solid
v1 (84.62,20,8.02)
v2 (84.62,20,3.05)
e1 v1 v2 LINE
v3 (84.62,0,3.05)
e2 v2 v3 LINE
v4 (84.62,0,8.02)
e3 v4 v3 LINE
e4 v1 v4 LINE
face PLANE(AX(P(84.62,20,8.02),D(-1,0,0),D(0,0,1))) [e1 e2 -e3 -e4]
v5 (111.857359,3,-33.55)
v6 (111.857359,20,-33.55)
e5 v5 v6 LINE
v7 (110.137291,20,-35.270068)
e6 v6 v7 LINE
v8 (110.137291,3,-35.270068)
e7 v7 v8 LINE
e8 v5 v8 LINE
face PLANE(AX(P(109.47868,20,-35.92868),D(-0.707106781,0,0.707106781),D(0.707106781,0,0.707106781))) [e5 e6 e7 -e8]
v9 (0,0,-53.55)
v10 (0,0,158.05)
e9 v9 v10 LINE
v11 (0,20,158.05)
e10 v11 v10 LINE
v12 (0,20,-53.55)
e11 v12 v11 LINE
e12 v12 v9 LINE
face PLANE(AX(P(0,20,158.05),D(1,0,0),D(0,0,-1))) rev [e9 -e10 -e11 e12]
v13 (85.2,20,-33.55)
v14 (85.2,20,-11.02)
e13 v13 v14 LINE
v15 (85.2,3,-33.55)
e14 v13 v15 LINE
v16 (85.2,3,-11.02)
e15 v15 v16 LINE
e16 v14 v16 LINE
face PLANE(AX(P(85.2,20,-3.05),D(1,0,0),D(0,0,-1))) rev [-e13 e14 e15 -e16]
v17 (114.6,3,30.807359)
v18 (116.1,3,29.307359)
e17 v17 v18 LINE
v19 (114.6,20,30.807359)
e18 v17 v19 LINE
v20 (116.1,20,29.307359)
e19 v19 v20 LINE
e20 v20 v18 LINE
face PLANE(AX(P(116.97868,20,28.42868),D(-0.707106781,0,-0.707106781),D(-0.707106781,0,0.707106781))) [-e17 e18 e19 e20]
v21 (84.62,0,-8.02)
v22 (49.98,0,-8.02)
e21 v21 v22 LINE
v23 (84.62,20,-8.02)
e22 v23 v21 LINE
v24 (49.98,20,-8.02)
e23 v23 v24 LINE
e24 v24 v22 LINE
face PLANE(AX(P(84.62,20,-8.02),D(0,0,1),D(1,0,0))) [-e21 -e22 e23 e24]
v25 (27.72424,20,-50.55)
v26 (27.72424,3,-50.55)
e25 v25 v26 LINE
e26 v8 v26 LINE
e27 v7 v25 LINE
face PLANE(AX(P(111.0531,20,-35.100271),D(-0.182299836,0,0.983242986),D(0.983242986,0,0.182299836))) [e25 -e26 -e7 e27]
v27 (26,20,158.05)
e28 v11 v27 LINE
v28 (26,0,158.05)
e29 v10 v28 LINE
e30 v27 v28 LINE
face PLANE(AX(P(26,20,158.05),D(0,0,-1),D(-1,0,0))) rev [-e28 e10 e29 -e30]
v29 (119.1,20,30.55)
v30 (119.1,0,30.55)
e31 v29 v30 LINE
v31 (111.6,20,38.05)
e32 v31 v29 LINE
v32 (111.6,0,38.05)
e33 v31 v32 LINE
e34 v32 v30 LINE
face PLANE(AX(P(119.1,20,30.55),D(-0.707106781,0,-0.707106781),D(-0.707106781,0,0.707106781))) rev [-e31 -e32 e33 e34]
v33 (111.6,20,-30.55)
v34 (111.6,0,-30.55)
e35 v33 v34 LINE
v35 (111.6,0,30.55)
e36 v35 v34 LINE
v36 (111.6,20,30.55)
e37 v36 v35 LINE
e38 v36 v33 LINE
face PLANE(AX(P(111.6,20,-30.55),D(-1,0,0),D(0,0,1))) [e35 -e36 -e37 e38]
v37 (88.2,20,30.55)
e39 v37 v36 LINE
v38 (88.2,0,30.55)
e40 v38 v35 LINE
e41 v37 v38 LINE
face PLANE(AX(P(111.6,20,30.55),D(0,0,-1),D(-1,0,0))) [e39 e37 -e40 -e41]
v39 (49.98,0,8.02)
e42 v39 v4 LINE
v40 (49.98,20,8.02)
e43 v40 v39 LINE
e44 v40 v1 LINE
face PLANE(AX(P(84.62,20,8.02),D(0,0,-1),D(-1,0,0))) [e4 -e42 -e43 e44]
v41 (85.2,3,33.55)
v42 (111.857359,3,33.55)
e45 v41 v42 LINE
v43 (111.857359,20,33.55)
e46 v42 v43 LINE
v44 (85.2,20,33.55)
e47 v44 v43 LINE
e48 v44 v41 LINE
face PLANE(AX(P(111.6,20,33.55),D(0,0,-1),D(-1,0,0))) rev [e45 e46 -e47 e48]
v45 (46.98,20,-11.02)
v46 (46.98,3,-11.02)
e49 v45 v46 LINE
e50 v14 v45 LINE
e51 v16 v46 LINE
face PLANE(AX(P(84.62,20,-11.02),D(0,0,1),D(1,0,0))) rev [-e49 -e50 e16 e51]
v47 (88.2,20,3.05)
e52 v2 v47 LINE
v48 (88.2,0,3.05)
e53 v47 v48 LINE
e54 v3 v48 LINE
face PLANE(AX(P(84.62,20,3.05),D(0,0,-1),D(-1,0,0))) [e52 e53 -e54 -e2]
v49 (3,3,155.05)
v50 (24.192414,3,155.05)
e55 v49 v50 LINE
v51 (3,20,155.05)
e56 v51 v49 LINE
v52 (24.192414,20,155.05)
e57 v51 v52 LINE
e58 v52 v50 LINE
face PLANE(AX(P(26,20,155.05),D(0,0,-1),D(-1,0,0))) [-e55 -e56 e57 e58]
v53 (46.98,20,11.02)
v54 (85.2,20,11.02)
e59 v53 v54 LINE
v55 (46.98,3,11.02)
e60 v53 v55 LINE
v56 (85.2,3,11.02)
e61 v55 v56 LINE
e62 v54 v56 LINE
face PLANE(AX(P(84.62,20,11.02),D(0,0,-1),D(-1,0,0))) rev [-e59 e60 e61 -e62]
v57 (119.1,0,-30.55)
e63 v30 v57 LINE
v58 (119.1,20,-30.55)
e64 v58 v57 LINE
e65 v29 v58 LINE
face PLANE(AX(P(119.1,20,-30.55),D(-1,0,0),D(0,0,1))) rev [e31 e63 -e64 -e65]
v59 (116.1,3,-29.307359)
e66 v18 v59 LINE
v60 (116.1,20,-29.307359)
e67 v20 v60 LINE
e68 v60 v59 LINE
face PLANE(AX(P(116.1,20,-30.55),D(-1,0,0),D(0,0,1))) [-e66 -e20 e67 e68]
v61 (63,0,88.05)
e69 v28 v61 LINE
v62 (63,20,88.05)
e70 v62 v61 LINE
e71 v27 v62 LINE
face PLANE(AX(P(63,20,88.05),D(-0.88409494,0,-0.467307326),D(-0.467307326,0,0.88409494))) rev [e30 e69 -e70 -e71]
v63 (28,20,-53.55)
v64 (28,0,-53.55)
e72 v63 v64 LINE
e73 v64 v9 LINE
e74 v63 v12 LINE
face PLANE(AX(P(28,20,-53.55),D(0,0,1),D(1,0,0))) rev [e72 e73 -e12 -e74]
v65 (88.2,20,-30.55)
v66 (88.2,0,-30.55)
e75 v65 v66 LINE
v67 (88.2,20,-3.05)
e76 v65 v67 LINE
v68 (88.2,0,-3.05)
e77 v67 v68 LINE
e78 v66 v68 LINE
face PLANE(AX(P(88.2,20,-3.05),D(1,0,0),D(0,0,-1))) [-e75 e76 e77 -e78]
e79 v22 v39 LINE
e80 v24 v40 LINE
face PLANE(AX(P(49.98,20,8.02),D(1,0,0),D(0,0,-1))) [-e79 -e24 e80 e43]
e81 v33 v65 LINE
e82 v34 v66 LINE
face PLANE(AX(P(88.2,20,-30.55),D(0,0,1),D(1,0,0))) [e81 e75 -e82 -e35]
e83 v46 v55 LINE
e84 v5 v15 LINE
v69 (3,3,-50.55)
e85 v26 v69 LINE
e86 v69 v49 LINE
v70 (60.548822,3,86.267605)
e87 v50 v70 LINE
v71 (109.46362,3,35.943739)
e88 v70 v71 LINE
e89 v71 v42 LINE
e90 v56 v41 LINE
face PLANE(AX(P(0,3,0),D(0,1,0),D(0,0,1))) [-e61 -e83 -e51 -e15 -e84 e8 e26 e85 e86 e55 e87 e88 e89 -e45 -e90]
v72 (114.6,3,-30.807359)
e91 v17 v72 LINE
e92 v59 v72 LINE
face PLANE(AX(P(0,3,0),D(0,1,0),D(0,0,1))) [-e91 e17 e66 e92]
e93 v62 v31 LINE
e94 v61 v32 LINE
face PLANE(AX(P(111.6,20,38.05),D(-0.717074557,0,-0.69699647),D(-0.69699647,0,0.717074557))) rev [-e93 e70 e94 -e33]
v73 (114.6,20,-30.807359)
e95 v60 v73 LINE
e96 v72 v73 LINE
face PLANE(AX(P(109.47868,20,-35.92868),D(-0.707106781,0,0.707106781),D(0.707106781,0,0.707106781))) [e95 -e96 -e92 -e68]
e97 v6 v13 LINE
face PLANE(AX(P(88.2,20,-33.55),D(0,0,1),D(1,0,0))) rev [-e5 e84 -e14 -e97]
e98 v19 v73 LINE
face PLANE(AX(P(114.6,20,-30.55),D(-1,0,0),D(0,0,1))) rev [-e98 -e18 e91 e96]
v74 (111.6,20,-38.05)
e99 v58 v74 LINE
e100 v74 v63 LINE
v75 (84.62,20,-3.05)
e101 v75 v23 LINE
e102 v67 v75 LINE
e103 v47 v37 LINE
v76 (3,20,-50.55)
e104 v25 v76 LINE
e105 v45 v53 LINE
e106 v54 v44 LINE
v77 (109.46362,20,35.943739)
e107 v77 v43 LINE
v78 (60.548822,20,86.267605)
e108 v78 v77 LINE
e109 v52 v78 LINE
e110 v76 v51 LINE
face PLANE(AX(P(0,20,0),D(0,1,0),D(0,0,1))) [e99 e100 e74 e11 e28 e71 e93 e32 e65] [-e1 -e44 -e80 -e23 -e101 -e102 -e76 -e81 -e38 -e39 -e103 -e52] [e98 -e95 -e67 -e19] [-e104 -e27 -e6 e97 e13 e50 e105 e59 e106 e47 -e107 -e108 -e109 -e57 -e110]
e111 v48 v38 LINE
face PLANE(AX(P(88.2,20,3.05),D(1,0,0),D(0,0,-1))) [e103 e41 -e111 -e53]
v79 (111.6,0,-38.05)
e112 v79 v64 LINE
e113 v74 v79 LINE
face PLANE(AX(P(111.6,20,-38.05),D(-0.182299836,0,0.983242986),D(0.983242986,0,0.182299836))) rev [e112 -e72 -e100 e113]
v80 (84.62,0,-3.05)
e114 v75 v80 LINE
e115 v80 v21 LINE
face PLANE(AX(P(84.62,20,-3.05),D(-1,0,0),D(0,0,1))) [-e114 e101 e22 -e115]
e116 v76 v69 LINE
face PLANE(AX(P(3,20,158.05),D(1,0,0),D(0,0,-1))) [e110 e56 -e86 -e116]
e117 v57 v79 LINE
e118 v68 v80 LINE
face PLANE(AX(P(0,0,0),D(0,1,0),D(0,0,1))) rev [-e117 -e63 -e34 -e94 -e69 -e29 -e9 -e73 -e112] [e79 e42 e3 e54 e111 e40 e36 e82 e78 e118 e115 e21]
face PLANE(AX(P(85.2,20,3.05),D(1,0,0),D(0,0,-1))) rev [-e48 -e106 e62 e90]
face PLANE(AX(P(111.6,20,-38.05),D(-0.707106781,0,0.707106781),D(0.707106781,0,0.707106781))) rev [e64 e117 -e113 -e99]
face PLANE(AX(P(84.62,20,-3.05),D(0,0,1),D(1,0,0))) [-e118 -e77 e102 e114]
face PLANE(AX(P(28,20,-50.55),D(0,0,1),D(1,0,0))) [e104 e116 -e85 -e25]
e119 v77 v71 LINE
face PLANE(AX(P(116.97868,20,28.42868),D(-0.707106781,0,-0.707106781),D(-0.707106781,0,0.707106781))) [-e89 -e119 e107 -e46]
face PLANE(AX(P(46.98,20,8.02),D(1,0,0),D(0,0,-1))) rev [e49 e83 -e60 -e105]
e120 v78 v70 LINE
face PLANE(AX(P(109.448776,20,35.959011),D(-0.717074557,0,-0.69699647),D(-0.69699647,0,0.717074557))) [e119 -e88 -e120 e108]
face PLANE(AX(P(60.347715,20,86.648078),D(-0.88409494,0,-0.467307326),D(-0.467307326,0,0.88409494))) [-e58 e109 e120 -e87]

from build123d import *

# Parameters (mm, degrees)
BOSS_EXTRUDE2_DEPTH = 20
SHELL1_START        = 3
SHELL1_DEPTH        = 17


# Read off the part's stored shape, not the designer's step: Shell1
with BuildPart() as part:
    # Sketch1 → Boss-Extrude2 (new body)
    with BuildSketch(Plane(origin=(0, 0, 0), x_dir=(1, 0, 0), z_dir=(0, 1, 0))):
        Polygon((111.6, 38.05), (28, 53.55), (0, 53.55), (0, -158.05), (26, -158.05), (63, -88.05), (111.6, -38.05), (119.1, -30.55), (119.1, 30.55), align=None)
        Polygon((84.62, 3.05), (84.62, 8.02), (49.98, 8.02), (49.98, -8.02), (84.62, -8.02), (84.62, -3.05), (88.2, -3.05), (88.2, -30.55), (111.6, -30.55), (111.6, 30.55), (88.2, 30.55), (88.2, 3.05), align=None, mode=Mode.SUBTRACT)
    extrude(amount=BOSS_EXTRUDE2_DEPTH)

    # Shell1 outline → Shell1 (cut)
    with BuildSketch(Plane(origin=(0, 0, 0), x_dir=(1, 0, 0), z_dir=(0, 1, 0)).offset(SHELL1_START)):
        Polygon((114.6, -30.807359313), (116.1, -29.307359313), (116.1, 29.307359313), (114.6, 30.807359313), align=None)
        Polygon((109.463620332, -35.943738981), (111.857359313, -33.55), (85.2, -33.55), (85.2, -11.02), (46.98, -11.02), (46.98, 11.02), (85.2, 11.02), (85.2, 33.55), (111.857359313, 33.55), (110.13729107, 35.270068243), (27.724239787, 50.55), (3, 50.55), (3, -155.05), (24.192413563, -155.05), (60.548822095, -86.26760548), align=None)
    extrude(amount=SHELL1_DEPTH, mode=Mode.SUBTRACT)


solid = part.part
